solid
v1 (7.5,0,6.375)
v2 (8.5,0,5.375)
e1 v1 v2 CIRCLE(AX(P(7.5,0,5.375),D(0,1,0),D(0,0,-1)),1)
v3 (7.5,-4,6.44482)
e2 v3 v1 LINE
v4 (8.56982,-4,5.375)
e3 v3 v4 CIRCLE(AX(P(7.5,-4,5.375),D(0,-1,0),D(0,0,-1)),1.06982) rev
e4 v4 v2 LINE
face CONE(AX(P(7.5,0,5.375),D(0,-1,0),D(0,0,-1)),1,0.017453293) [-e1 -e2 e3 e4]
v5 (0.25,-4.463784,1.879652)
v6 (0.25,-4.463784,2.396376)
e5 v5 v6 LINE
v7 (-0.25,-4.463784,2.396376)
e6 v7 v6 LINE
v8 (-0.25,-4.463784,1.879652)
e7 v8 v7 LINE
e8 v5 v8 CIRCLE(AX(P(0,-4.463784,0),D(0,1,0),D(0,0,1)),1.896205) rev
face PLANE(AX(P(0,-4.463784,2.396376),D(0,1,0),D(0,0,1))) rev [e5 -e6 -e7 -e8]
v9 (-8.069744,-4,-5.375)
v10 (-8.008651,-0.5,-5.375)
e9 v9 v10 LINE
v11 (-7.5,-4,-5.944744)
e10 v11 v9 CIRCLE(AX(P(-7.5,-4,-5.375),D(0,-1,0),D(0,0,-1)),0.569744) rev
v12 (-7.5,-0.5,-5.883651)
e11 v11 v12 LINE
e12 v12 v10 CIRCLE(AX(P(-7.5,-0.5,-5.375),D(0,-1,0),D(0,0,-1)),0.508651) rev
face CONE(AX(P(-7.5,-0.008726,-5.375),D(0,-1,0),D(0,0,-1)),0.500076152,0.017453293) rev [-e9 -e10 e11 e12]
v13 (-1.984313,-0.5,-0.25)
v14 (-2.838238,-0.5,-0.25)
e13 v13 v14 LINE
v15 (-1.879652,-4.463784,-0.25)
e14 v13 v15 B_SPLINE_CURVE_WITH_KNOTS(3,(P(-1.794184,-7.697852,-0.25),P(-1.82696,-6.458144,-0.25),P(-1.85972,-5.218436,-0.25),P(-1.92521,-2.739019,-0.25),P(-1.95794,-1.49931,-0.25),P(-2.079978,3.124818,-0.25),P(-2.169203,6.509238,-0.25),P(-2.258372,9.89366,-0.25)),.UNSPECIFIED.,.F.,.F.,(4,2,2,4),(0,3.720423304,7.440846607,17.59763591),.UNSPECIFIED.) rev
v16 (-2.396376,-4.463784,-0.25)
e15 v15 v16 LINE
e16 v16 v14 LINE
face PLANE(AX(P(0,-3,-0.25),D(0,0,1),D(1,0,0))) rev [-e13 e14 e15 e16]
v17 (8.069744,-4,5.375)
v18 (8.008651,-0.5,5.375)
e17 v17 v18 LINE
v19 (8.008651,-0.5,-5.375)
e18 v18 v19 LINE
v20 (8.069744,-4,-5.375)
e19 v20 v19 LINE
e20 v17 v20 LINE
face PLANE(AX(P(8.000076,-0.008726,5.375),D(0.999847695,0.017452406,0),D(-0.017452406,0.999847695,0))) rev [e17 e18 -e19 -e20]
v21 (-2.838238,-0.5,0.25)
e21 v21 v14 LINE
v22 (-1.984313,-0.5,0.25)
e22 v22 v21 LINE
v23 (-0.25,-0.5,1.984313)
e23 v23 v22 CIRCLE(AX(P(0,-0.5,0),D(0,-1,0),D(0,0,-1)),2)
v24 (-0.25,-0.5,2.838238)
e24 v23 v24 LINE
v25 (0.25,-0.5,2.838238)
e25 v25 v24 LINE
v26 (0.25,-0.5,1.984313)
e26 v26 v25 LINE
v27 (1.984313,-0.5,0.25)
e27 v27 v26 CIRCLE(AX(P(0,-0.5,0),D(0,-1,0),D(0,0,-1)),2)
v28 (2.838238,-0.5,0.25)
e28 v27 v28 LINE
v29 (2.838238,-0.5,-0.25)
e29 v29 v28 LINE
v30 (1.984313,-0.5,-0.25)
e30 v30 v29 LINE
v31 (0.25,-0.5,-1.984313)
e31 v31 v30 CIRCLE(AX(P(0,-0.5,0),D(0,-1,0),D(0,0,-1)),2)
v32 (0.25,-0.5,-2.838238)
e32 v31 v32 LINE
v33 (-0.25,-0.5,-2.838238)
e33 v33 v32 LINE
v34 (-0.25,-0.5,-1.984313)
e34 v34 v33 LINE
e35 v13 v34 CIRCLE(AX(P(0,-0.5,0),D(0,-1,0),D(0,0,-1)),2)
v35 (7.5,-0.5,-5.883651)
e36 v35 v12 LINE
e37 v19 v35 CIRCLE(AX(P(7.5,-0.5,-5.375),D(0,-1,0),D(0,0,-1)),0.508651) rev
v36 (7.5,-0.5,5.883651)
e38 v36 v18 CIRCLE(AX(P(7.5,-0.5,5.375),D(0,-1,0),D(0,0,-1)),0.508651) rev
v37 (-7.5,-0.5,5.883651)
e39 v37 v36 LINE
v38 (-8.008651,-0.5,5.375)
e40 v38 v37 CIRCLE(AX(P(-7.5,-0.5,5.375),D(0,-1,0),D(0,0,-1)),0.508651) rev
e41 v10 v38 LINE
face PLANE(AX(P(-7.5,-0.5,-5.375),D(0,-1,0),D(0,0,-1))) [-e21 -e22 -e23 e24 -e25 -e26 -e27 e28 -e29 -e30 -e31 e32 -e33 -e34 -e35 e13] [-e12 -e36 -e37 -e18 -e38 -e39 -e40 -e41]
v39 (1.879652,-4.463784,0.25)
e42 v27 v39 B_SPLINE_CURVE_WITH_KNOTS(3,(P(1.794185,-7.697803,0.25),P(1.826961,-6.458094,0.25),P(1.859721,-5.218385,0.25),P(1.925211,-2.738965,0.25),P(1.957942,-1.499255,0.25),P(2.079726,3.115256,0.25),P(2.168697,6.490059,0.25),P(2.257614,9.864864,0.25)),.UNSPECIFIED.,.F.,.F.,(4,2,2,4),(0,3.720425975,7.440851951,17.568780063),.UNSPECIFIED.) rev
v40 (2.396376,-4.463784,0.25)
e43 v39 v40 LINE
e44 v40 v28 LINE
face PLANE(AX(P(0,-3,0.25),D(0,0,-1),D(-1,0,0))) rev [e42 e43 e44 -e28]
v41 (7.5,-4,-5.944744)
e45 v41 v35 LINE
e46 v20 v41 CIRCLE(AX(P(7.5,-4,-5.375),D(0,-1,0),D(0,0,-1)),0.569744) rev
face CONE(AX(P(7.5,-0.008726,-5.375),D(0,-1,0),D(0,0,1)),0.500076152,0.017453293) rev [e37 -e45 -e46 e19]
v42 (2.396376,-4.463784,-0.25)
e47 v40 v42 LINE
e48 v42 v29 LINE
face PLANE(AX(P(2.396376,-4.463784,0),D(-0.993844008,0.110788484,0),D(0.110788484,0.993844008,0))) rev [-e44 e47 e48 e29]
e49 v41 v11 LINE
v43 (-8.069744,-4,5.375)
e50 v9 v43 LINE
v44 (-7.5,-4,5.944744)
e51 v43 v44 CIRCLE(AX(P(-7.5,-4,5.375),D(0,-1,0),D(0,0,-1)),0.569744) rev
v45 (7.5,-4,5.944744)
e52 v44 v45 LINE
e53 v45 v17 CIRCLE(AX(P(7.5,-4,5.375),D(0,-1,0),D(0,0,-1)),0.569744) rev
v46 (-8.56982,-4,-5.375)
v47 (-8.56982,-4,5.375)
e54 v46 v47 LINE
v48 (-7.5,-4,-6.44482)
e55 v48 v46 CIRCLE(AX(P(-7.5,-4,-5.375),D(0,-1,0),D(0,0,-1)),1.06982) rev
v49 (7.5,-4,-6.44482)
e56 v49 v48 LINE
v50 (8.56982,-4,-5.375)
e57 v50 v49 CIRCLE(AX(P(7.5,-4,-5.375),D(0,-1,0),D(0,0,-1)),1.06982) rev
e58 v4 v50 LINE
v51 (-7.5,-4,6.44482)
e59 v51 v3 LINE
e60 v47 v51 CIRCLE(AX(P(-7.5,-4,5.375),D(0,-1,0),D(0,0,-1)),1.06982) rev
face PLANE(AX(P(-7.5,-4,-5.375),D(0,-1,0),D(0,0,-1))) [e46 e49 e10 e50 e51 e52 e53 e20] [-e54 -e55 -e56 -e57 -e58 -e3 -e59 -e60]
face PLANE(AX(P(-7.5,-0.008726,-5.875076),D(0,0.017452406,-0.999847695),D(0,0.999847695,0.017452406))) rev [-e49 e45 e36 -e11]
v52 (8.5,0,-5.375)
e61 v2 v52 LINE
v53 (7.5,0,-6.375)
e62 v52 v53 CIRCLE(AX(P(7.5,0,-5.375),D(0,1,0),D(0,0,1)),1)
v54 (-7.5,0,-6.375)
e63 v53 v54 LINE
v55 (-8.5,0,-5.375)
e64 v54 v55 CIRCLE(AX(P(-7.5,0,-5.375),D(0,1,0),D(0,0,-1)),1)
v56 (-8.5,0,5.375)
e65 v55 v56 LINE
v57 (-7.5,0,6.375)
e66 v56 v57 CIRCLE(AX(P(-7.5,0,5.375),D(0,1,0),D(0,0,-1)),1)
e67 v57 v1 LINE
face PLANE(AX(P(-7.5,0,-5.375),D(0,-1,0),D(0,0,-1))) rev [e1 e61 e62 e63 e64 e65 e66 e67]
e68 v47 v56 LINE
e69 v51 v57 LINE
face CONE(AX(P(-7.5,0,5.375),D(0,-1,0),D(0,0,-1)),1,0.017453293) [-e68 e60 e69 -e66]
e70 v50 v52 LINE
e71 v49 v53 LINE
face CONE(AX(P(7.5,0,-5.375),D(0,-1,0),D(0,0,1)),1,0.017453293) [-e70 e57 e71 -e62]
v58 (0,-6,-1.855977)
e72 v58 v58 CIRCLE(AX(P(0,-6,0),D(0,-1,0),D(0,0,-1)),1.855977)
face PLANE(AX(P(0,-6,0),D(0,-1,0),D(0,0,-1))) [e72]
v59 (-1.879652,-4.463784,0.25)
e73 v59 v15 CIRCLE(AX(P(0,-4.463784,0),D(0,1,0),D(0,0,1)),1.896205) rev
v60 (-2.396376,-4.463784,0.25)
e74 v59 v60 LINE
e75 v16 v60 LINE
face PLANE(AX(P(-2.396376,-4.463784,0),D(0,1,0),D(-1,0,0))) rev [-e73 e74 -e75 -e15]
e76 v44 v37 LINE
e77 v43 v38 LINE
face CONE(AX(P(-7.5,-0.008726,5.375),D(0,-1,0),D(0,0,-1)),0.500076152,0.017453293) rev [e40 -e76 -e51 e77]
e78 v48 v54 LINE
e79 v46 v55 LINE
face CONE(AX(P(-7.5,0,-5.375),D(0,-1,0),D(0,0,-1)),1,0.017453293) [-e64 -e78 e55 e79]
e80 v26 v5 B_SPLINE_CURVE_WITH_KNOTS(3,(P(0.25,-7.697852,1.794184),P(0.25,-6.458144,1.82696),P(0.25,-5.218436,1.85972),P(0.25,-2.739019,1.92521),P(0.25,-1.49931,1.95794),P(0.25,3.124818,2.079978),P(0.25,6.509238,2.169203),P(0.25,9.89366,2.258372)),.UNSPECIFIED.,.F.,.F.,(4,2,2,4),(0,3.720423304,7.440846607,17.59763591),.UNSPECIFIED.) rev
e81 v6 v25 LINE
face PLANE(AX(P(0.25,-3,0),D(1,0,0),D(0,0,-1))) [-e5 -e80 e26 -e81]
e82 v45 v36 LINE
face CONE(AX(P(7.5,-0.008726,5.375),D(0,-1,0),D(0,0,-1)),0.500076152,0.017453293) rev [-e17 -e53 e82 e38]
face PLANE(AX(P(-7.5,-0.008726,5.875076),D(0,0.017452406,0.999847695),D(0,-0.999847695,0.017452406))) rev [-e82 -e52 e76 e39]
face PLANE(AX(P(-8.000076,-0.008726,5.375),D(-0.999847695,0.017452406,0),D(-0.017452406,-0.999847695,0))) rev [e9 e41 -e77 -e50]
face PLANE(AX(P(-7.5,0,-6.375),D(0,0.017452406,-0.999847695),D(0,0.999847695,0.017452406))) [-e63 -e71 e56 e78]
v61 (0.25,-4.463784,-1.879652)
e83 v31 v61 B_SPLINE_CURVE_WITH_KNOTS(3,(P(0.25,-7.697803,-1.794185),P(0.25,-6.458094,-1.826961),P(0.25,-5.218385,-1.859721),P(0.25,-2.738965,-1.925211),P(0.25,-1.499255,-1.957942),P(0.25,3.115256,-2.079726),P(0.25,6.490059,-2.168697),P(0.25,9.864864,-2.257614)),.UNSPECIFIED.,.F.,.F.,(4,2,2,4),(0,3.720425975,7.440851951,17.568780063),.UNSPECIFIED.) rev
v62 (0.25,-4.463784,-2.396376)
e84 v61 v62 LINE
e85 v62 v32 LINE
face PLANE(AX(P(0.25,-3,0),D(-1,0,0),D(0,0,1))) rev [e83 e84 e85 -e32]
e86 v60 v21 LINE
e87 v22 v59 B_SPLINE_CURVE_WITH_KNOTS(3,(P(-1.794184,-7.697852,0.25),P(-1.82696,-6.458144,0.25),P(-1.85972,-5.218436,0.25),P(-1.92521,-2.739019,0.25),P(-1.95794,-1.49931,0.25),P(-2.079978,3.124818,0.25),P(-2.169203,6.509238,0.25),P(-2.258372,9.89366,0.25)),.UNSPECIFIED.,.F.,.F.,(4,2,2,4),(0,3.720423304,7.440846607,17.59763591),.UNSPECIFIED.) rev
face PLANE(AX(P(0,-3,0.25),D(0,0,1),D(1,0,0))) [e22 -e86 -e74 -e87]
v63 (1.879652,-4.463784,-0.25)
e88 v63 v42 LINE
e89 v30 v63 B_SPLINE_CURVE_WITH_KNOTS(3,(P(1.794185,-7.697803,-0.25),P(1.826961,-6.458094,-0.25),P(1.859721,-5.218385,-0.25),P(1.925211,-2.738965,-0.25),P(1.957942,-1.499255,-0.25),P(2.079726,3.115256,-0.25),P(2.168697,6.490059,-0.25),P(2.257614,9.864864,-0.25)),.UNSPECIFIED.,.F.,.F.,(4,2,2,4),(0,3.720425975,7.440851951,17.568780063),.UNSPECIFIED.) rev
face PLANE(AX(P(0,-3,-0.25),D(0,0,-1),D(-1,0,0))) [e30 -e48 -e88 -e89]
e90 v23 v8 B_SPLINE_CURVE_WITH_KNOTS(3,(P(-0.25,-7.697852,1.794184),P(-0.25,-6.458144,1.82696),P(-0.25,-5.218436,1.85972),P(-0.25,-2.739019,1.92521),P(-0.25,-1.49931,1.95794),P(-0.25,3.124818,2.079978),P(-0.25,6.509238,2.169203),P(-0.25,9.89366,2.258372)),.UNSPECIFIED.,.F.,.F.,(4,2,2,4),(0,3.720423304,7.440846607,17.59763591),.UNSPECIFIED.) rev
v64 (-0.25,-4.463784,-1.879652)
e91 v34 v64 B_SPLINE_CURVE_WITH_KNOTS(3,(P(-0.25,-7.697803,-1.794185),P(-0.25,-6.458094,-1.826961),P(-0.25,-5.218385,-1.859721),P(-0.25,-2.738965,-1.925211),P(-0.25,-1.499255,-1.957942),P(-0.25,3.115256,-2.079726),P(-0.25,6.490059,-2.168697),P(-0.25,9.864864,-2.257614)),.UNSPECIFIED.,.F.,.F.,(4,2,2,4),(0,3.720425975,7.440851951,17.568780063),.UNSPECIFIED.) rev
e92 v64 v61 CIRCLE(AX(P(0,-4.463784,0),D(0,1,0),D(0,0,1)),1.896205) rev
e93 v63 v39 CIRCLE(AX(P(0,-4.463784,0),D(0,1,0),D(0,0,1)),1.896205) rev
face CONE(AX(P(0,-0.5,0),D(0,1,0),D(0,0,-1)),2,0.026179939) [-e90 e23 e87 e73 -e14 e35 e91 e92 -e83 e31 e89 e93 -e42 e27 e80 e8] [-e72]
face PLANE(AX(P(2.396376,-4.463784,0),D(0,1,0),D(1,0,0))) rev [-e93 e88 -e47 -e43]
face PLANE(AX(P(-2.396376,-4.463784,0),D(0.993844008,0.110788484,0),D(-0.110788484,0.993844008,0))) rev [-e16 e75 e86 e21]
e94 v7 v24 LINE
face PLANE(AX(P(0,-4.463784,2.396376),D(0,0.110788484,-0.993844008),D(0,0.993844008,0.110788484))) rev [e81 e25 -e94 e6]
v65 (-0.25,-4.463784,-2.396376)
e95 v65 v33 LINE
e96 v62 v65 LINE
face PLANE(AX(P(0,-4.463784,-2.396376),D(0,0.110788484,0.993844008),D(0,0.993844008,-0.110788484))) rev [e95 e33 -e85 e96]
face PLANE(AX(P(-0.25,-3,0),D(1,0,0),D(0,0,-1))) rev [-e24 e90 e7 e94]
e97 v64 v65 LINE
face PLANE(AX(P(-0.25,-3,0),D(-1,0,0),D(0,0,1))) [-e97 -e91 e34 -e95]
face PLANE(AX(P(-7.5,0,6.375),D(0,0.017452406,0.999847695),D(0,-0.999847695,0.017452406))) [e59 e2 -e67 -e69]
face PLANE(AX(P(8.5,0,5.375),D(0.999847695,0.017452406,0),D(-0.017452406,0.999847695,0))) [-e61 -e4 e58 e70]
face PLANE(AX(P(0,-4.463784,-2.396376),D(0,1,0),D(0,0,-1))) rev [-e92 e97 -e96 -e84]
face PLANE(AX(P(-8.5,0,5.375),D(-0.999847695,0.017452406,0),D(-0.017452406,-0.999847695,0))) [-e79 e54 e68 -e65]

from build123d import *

# Parameters (mm, degrees)
BOSS_EXTRUDE1_DEPTH = 4
BOSS_EXTRUDE1_DRAFT = 1
SHELL1_T            = -0.5
SKETCH2_R           = 2
BOSS_EXTRUDE2_DEPTH = 5.5
BOSS_EXTRUDE2_TAPER = 1.5
RIB1_START          = -0.25
RIB1_DEPTH          = 0.5
CIRPATTERN1_COUNT   = 4


# Read off the part's stored shape, not the designer's step: Rib1
with BuildPart() as part:
    # Sketch1 → Boss-Extrude1 (with draft: the straight prism first)
    with BuildSketch(Plane(origin=(0, 0, 0), x_dir=(1, 0, 0), z_dir=(0, 1, 0))):
        with BuildLine():
            Line((-7.5, -6.375), (7.5, -6.375))
            ThreePointArc((7.5, -6.375), (8.207106781, -6.082106781), (8.5, -5.375))
            Line((8.5, -5.375), (8.5, 5.375))
            ThreePointArc((8.5, 5.375), (8.207106781, 6.082106781), (7.5, 6.375))
            Line((7.5, 6.375), (-7.5, 6.375))
            ThreePointArc((-7.5, 6.375), (-8.207106781, 6.082106781), (-8.5, 5.375))
            Line((-8.5, 5.375), (-8.5, -5.375))
            ThreePointArc((-8.5, -5.375), (-8.207106781, -6.082106781), (-7.5, -6.375))
        make_face()
    extrude(amount=-BOSS_EXTRUDE1_DEPTH)
    # Boss-Extrude1: the draft: its side faces are tilted about the plane it starts from
    boss_extrude1_sides = [part.faces().sort_by_distance(p)[0] for p in [
        (0, -2, 6.375),
        (8.207106781, -2, 6.082106781),
        (8.5, -2, 0),
        (8.207106781, -2, -6.082106781),
        (0, -2, -6.375),
        (-8.207106781, -2, -6.082106781),
        (-8.5, -2, 0),
        (-8.207106781, -2, 6.082106781),
    ]]
    draft(boss_extrude1_sides, Plane(origin=(0, 0, 0), x_dir=(1, 0, 0), z_dir=(0, 1, 0)), BOSS_EXTRUDE1_DRAFT)

    # Shell1
    shell1_openings = [part.faces().sort_by_distance(p)[0] for p in [
        (0, -4, 0),
    ]]
    offset(amount=SHELL1_T, openings=shell1_openings, kind=Kind.INTERSECTION)

    # Sketch2 → Boss-Extrude2 (add)
    with BuildSketch(Plane.XZ.offset(0.5)):
        Circle(SKETCH2_R)
    extrude(amount=BOSS_EXTRUDE2_DEPTH, taper=BOSS_EXTRUDE2_TAPER)

    # Rib1 outline → Rib1 (add)
    with BuildSketch(Plane.XY.offset(RIB1_START)):
        Polygon((-2.396376072, -4.46378352), (-1, -4.46378352), (-1, 0), (-2.893975097, 0), (-2.838237736, -0.5), align=None)
    rib1 = extrude(amount=RIB1_DEPTH)

    # CirPattern1: Rib1 ×4 about axis
    cirpattern1_axis = Axis((0, 0, 0), (0, 1, 0))
    for i in range(1, CIRPATTERN1_COUNT):
        add(rib1.rotate(cirpattern1_axis, i * 360 / CIRPATTERN1_COUNT))


solid = part.part
